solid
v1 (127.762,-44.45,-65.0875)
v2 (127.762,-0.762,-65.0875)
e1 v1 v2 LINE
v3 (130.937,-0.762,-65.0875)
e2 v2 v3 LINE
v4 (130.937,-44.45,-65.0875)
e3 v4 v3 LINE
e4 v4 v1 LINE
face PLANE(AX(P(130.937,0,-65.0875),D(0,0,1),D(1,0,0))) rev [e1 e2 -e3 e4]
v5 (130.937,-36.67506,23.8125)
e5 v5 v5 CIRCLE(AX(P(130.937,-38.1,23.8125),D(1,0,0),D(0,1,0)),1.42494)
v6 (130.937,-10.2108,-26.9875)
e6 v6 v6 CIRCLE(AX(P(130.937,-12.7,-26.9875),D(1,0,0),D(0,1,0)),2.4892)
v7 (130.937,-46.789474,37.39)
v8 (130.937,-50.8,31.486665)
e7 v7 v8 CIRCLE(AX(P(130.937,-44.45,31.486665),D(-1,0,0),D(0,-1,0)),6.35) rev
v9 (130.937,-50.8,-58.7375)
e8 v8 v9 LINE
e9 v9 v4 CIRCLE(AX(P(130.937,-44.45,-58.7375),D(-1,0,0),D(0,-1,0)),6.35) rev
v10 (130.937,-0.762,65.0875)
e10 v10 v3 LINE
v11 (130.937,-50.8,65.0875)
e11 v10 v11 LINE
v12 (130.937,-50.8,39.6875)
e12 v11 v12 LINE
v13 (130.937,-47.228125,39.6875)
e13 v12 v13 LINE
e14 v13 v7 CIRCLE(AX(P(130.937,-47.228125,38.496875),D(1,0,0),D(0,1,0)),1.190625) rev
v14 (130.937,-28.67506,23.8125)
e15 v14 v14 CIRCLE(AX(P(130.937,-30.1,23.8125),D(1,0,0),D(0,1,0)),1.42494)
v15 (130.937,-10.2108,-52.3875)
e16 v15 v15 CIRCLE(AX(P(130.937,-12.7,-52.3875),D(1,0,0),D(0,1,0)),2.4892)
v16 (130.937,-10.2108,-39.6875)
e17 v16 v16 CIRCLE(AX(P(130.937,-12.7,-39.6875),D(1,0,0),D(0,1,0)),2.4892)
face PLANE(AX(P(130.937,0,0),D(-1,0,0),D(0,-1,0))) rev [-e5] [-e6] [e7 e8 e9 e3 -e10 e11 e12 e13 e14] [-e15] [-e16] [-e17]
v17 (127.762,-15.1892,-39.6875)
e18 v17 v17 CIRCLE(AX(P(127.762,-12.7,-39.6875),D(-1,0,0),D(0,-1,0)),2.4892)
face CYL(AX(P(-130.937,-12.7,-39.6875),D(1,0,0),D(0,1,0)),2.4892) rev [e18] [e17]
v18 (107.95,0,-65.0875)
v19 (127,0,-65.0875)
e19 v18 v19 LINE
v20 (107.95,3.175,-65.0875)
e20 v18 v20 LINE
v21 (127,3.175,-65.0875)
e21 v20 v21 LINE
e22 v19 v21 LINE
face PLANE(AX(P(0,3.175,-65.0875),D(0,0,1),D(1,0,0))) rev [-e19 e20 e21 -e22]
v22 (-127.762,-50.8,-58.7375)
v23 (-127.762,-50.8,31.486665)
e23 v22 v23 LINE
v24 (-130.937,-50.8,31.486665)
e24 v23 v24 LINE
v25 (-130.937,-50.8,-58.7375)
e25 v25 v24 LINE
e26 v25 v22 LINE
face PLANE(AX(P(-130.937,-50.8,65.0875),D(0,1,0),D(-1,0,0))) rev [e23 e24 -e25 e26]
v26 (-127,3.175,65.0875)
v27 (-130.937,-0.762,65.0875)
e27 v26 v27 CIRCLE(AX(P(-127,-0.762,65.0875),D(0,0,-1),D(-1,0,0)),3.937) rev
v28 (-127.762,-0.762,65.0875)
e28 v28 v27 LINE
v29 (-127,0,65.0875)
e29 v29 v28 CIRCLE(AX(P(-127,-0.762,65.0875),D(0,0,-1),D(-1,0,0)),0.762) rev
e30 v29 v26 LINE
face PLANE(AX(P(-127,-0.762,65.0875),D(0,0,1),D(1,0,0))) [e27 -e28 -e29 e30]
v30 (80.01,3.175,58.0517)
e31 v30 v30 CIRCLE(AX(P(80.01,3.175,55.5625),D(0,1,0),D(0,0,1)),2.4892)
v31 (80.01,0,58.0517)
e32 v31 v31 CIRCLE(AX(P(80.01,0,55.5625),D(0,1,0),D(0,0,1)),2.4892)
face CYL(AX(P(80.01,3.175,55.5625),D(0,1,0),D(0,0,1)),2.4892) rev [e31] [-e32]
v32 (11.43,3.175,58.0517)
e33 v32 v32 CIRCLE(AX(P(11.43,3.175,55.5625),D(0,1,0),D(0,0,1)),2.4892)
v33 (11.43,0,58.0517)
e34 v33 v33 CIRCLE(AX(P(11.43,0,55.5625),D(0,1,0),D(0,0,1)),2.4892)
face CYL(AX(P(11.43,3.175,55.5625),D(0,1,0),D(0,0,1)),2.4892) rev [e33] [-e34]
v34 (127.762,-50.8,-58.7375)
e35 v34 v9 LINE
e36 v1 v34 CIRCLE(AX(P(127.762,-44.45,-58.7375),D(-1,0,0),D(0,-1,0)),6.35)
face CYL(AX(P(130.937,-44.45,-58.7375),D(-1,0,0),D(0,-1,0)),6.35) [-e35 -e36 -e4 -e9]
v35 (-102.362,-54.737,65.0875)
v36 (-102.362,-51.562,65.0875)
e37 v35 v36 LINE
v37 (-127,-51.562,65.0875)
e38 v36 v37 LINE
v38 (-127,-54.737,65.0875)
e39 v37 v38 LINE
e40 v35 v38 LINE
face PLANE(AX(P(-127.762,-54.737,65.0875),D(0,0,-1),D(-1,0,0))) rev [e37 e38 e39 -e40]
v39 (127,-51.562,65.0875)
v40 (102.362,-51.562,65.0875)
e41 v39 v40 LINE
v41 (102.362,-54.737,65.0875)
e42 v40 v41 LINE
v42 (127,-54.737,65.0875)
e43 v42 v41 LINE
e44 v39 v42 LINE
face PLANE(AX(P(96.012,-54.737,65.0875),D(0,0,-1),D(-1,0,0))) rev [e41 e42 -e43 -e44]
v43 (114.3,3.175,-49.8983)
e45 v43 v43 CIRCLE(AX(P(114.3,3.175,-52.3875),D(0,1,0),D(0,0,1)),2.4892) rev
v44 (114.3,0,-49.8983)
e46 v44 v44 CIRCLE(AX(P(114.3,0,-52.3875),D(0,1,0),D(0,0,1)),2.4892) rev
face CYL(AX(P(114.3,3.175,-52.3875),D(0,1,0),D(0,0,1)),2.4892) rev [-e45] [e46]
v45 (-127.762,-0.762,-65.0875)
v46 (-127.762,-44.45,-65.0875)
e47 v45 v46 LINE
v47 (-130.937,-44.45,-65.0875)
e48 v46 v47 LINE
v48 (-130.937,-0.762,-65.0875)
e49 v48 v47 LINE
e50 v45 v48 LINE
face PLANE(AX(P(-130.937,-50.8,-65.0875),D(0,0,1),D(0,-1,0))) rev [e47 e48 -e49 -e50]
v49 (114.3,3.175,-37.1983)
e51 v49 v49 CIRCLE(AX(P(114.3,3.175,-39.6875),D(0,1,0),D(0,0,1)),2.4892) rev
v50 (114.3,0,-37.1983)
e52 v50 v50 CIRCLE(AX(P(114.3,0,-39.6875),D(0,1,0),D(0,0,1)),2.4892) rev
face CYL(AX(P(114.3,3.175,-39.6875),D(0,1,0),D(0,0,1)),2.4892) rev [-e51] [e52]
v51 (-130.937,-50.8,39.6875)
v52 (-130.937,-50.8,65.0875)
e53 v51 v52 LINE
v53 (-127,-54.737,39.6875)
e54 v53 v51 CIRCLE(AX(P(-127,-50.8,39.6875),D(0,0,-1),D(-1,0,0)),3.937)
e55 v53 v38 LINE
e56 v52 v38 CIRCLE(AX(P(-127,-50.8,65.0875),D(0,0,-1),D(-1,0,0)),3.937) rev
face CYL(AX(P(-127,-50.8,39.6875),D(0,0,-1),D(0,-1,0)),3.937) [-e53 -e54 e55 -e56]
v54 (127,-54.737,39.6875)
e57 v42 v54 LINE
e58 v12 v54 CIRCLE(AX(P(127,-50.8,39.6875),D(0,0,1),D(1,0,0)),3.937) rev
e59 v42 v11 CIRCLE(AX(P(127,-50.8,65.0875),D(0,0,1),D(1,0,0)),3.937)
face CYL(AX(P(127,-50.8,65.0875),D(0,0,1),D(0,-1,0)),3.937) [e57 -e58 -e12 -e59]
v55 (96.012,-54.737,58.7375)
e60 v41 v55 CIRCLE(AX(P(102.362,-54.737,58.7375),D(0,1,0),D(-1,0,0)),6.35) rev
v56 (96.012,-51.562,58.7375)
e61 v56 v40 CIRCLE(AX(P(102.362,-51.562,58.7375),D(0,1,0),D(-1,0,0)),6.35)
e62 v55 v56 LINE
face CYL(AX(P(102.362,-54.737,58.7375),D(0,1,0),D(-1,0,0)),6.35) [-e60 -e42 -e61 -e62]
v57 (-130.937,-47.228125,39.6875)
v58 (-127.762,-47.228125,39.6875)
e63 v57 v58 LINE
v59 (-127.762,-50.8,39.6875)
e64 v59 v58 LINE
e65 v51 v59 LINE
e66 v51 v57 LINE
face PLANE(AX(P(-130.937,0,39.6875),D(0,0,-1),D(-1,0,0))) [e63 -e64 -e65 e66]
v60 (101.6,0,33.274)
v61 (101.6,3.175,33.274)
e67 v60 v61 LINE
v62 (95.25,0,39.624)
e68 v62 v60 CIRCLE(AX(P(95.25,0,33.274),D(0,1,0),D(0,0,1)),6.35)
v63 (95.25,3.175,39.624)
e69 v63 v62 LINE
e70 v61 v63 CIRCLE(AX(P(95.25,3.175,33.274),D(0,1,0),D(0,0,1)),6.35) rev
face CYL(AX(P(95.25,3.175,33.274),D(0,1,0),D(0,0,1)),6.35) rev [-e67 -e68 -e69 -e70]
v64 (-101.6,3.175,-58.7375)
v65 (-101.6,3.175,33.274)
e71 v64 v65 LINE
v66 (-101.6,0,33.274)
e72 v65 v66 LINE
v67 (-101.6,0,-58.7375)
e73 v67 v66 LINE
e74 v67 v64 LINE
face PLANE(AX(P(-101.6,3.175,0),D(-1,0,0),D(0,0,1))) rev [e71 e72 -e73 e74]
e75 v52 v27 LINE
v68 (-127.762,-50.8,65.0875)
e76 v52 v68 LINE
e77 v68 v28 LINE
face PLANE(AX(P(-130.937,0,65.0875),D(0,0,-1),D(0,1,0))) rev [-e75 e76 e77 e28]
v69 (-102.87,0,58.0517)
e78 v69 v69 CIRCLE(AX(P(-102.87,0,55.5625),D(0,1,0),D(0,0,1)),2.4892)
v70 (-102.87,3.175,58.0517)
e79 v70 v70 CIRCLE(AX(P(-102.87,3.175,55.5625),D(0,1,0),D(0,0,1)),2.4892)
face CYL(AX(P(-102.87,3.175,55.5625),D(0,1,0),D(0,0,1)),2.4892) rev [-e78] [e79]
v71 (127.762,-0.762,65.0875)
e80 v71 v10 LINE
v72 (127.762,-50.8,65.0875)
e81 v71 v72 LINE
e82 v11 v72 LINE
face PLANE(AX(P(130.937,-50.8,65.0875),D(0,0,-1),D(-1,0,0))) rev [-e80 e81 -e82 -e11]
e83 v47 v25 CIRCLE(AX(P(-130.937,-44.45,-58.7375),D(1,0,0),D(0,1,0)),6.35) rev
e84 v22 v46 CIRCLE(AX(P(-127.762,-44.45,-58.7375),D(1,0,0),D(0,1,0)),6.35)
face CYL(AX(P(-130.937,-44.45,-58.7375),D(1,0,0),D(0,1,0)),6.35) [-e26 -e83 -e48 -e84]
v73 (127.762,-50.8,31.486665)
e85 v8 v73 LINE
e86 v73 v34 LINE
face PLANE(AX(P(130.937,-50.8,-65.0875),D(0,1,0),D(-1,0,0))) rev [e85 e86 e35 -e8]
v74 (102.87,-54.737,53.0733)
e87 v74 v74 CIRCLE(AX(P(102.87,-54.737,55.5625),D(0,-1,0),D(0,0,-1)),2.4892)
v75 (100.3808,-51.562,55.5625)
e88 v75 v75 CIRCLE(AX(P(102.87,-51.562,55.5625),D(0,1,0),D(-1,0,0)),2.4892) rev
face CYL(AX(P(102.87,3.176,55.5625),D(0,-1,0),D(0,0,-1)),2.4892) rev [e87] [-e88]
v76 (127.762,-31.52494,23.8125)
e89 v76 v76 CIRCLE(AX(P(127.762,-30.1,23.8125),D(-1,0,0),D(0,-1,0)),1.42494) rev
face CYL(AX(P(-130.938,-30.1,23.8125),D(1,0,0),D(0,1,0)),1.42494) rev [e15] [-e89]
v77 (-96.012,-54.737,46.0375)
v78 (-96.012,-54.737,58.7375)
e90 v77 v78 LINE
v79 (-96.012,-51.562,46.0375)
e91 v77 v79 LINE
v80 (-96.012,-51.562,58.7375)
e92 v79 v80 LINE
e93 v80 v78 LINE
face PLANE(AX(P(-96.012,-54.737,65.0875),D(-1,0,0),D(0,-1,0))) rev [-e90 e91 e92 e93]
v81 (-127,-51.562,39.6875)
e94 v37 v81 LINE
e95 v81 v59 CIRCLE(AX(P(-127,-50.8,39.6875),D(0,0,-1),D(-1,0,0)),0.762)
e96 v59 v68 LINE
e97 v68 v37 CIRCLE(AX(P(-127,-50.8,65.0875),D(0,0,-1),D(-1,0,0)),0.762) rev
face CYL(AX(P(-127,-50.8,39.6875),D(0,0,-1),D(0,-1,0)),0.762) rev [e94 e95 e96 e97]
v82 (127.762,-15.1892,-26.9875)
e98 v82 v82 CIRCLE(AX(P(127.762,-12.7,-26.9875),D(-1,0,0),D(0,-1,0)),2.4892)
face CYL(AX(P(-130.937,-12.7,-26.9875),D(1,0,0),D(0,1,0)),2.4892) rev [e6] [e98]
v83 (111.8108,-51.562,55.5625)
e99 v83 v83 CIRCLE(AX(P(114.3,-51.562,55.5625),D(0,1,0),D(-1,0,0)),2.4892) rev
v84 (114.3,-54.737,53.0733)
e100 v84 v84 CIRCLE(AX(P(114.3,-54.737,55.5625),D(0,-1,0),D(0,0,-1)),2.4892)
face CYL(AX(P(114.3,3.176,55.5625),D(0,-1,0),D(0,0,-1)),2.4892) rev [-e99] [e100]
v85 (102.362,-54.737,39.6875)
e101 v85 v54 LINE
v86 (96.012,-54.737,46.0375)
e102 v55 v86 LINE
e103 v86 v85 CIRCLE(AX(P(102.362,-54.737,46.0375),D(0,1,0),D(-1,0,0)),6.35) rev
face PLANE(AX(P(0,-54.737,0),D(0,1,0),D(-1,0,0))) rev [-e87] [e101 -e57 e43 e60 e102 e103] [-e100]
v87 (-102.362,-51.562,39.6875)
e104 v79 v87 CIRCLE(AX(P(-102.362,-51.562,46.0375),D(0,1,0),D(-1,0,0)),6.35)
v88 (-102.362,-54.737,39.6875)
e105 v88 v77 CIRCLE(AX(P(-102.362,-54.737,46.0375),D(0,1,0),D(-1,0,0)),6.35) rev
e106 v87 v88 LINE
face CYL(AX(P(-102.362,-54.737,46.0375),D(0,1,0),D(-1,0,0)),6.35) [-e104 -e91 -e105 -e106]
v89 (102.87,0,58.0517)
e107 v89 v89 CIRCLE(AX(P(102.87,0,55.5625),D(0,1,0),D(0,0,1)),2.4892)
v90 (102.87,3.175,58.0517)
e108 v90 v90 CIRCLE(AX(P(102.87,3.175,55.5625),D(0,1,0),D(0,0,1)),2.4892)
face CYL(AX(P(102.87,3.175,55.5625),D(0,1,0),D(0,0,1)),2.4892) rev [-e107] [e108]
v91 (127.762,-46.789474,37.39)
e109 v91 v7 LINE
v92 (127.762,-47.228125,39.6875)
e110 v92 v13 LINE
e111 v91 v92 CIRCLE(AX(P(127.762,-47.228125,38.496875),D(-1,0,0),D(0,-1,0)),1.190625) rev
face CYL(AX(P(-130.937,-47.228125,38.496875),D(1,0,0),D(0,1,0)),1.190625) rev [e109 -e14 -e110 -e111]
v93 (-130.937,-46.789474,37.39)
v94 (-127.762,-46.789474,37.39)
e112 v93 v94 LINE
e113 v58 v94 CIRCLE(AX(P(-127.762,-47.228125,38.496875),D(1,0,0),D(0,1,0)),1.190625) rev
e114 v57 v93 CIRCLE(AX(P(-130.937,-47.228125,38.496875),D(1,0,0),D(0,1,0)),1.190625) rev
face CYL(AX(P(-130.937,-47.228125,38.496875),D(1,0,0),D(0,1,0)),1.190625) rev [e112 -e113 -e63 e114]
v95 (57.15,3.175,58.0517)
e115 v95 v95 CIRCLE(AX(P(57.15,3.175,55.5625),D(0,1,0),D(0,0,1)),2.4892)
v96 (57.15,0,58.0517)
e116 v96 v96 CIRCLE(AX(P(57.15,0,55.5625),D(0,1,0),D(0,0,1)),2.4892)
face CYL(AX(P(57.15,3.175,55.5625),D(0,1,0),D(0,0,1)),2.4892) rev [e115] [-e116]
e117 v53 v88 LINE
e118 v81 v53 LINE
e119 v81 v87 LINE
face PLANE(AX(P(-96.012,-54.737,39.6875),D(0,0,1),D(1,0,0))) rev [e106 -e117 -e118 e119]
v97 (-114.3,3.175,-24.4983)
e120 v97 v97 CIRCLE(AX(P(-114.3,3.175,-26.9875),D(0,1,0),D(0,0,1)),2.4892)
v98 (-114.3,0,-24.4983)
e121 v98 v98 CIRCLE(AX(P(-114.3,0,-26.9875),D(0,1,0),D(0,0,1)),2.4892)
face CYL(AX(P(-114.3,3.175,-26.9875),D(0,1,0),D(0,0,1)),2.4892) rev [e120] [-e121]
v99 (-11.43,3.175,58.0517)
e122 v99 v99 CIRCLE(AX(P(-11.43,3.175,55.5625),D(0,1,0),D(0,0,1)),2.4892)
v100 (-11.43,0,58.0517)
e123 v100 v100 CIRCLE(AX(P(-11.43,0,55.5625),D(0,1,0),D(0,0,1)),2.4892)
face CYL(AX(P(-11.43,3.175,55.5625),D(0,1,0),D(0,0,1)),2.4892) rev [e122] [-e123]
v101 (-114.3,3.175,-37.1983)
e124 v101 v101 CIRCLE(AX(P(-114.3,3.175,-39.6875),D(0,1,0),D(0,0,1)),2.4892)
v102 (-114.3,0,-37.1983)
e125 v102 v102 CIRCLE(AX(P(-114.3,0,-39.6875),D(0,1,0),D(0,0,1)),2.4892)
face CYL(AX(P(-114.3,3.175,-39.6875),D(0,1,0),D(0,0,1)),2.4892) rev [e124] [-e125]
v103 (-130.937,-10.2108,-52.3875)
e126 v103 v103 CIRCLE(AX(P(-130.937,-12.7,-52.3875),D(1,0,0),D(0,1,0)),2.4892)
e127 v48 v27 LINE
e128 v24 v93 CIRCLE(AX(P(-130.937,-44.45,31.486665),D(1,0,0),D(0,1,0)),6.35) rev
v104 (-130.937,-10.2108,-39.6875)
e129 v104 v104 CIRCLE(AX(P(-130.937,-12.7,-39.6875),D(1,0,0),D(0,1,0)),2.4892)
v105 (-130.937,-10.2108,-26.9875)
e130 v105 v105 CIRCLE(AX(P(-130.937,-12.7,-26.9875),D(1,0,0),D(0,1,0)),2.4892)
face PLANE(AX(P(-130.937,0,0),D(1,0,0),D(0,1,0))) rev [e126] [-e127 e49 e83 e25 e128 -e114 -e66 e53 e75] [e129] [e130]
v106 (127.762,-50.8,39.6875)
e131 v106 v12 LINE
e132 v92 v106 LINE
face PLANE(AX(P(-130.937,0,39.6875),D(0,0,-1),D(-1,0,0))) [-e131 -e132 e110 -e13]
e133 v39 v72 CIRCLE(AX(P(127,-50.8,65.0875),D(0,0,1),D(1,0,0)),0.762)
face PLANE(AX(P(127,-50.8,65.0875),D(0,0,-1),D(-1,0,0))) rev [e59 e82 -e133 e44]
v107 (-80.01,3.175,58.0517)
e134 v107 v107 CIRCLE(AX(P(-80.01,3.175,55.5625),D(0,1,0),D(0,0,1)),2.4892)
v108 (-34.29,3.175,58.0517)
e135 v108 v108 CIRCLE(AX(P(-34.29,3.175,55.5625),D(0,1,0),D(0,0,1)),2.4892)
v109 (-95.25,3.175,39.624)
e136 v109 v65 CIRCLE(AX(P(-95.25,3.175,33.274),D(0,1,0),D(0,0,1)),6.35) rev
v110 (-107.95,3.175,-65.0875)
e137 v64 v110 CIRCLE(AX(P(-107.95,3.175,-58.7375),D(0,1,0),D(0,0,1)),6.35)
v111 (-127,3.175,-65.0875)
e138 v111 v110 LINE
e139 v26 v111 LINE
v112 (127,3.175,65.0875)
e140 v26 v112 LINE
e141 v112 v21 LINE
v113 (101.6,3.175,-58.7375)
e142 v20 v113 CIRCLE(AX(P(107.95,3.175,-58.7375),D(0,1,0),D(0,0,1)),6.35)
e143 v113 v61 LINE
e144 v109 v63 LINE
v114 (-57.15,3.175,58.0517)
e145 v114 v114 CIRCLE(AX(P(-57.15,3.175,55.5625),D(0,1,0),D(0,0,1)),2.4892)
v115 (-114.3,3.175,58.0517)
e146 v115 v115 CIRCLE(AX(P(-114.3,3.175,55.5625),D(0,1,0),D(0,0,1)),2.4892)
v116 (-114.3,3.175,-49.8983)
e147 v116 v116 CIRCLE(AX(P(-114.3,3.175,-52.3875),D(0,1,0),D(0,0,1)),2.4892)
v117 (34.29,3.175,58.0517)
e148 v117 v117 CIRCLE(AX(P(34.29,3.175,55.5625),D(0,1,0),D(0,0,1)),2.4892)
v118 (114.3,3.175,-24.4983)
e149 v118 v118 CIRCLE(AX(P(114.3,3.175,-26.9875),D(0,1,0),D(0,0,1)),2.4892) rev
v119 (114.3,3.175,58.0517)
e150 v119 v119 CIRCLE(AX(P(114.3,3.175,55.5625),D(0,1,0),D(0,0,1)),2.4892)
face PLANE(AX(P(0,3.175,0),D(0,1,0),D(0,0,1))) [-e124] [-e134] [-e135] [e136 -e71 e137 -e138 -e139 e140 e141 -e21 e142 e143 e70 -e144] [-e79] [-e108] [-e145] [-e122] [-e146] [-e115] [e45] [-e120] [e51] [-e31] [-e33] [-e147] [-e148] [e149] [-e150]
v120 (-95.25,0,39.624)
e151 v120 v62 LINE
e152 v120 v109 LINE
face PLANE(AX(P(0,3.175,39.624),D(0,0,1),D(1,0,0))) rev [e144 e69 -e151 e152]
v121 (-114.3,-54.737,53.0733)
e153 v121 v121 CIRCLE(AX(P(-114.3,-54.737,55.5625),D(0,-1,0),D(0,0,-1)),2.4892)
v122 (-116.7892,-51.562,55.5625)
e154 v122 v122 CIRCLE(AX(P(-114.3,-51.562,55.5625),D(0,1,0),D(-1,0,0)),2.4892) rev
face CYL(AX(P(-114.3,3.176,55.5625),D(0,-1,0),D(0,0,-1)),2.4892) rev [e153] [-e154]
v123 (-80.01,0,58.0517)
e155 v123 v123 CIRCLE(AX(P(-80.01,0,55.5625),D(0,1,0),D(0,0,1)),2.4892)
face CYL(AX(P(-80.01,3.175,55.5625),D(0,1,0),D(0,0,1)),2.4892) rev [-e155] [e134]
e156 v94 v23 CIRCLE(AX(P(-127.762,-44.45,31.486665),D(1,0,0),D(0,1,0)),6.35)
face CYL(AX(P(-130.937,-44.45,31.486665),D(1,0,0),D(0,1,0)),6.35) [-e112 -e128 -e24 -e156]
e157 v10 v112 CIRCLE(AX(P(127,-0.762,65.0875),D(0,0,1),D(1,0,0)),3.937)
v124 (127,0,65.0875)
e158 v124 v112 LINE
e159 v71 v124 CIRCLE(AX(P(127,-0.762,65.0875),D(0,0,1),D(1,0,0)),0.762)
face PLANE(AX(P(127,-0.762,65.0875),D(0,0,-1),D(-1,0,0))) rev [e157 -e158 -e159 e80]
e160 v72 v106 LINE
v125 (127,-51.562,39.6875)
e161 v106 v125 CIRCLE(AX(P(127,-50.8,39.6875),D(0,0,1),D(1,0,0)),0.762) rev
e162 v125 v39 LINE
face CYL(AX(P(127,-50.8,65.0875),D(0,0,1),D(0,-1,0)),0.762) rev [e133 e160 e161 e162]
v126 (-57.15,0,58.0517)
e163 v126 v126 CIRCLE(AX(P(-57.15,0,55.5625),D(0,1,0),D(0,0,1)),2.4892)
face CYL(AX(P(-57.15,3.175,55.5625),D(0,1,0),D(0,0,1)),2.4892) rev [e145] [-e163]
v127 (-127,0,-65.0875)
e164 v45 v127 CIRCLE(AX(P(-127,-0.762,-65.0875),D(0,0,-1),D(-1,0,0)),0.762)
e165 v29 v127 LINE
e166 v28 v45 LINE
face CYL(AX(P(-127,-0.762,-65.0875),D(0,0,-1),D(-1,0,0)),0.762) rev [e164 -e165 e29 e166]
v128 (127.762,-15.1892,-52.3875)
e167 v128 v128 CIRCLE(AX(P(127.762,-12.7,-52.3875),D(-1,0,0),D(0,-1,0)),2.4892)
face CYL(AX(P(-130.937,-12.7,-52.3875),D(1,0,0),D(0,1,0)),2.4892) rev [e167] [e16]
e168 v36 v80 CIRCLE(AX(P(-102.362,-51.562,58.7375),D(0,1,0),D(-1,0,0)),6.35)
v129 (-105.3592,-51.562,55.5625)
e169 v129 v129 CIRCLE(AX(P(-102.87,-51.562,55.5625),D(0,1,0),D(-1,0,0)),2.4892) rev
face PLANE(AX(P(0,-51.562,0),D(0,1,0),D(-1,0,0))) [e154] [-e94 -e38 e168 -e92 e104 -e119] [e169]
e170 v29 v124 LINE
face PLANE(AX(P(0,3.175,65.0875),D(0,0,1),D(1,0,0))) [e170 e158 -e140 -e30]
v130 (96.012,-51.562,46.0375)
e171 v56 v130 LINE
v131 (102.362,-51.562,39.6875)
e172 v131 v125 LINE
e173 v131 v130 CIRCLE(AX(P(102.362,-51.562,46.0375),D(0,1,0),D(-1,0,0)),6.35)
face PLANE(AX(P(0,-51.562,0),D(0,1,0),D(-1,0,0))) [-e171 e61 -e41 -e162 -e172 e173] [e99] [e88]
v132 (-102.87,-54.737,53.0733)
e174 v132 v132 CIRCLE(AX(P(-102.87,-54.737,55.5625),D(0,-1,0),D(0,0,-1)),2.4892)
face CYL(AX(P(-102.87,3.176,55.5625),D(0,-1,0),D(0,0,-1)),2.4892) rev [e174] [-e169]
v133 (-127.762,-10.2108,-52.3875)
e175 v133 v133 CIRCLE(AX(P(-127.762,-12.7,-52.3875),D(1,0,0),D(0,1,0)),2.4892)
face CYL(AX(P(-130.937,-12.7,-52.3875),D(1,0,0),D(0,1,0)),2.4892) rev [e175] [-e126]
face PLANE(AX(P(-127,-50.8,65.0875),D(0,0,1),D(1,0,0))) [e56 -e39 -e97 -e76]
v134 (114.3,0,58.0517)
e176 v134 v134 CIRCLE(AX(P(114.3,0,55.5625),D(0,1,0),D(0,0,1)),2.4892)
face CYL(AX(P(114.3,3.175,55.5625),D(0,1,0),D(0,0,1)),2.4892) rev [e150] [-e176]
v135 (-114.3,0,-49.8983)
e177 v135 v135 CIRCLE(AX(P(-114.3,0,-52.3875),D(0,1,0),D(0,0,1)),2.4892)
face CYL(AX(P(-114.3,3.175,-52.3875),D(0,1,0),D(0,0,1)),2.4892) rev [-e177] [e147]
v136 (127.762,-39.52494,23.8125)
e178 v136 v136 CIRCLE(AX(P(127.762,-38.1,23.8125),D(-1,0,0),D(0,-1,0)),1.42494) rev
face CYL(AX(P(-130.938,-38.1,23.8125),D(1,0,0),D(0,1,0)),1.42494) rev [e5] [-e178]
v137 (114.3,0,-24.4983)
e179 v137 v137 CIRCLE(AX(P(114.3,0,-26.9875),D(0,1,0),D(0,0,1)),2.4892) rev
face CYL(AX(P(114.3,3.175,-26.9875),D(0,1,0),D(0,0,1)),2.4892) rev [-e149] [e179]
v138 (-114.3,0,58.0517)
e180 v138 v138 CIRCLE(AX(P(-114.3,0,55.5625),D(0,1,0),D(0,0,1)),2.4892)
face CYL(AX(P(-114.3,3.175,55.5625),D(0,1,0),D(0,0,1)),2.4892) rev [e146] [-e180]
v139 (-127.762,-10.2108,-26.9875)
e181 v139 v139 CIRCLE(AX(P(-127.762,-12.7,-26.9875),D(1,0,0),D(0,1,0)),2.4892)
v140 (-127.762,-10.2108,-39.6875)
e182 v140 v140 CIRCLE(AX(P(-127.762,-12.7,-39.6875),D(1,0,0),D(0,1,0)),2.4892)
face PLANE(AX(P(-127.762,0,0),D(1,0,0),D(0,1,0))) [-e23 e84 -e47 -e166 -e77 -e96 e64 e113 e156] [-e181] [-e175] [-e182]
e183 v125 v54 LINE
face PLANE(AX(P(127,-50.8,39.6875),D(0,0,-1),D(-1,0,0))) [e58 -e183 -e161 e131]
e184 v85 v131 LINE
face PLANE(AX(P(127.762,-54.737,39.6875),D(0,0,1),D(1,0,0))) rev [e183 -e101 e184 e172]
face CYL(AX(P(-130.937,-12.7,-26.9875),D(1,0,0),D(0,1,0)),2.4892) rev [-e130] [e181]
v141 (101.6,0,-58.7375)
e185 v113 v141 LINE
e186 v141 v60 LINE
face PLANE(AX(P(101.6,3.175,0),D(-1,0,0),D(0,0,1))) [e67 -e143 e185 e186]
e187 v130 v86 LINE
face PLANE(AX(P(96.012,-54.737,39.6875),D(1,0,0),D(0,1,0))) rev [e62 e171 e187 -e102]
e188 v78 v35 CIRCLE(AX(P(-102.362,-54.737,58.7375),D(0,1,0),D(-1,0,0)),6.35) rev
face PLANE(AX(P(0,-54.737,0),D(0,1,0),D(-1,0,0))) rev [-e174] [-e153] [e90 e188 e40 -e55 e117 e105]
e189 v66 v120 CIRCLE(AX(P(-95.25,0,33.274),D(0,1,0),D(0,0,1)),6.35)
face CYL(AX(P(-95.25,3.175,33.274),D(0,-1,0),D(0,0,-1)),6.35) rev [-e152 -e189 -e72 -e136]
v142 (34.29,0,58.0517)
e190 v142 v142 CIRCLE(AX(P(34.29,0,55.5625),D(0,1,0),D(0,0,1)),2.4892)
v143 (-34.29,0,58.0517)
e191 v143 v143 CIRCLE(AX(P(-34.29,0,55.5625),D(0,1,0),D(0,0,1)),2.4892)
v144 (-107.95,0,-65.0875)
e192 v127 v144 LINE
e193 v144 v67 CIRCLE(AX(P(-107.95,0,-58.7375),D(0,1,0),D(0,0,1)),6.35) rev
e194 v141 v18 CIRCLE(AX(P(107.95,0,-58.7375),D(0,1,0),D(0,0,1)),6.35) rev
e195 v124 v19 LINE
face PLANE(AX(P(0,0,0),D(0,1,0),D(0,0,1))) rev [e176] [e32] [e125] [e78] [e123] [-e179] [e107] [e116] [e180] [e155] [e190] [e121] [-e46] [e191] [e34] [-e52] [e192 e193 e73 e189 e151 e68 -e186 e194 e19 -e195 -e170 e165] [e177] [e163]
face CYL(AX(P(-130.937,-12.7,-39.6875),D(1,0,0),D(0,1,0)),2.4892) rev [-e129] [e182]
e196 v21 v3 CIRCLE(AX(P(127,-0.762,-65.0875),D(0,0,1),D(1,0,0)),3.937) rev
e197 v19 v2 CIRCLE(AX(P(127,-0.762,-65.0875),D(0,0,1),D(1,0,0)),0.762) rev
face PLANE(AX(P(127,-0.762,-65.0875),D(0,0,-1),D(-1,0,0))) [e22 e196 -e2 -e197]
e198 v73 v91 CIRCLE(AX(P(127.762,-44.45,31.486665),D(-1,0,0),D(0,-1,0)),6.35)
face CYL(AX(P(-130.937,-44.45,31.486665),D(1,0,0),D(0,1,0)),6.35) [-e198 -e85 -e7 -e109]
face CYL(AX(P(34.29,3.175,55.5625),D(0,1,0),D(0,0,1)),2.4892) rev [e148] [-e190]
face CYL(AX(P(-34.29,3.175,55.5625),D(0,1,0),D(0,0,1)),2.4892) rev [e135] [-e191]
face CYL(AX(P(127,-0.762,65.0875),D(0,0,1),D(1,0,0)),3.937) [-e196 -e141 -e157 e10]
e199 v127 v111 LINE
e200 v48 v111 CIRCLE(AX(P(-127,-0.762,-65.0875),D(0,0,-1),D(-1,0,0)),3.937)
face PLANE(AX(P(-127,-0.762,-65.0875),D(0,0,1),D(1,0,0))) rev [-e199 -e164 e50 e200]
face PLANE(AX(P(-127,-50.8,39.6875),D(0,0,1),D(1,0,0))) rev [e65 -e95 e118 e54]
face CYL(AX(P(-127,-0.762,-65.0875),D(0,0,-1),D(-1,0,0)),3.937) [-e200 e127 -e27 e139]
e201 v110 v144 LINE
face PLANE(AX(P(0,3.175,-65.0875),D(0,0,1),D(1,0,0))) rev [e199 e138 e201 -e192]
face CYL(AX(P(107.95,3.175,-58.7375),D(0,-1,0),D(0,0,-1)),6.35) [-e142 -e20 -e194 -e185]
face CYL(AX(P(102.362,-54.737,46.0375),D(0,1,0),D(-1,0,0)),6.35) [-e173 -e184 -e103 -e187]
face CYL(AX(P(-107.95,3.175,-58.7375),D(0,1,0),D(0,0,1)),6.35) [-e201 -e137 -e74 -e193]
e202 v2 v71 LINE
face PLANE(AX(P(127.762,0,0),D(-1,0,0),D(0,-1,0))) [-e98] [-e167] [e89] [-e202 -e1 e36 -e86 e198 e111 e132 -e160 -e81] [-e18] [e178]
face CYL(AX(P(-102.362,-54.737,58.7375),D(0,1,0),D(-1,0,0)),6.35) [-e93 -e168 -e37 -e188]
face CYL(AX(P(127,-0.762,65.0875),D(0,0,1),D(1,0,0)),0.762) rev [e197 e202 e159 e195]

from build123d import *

# Parameters (mm, degrees)
SKETCH2_R               = 2.4892
BOSS_EXTRUDE1_DEPTH     = 3.175
SKETCH3_R               = 2.4892
CUT_EXTRUDE1_DEPTH      = 143.74264703
EDGE_FLANGE1_DEPTH      = 130.175
EDGE_FLANGE1_BEND_DEPTH = 130.175
CUT_EXTRUDE2_DEPTH      = 275.581526204
EDGE_FLANGE2_DEPTH      = 25.4
EDGE_FLANGE2_BEND_DEPTH = 25.4
CUT_EXTRUDE3_REACH      = 159.273
SKETCH22_R              = 2.4892
FILLET2_R               = 6.35
SKETCH23_R              = 2.4892
CUT_EXTRUDE4_DEPTH      = 276.337091157
CUT_EXTRUDE5_REACH      = 277.337
SKETCH24_R              = 1.42494


# Sheet-metal steps are written as plain solids
with BuildPart() as part:
    # Sketch2 → Boss-Extrude1 (new body)
    with BuildSketch(Plane(origin=(0, 0, 0), x_dir=(1, 0, 0), z_dir=(0, 1, 0))):
        Polygon((-127, 65.0875), (-127, -65.0875), (127, -65.0875), (127, 65.0875), (101.6, 65.0875), (101.6, -39.624), (-101.6, -39.624), (-101.6, 65.0875), align=None)
        with Locations(Location((-114.3, 26.9875, 0), (0, 0, 270))):
            Circle(SKETCH2_R, mode=Mode.SUBTRACT)
        with Locations(Location((-114.3, 39.6875, 0), (0, 0, 270))):
            Circle(SKETCH2_R, mode=Mode.SUBTRACT)
        with Locations(Location((-114.3, 52.3875, 0), (0, 0, 270))):
            Circle(SKETCH2_R, mode=Mode.SUBTRACT)
        with Locations(Location((114.3, 26.9875, 0), (0, 0, 270))):
            Circle(SKETCH2_R, mode=Mode.SUBTRACT)
        with Locations(Location((114.3, 39.6875, 0), (0, 0, 270))):
            Circle(SKETCH2_R, mode=Mode.SUBTRACT)
        with Locations(Location((114.3, 52.3875, 0), (0, 0, 270))):
            Circle(SKETCH2_R, mode=Mode.SUBTRACT)
    extrude(amount=BOSS_EXTRUDE1_DEPTH)

    # Sketch3 → Cut-Extrude1 (cut, through all)
    with BuildSketch(Plane(origin=(0, 3.175, 0), x_dir=(1, 0, 0), z_dir=(0, 1, 0))):
        with Locations(Location((-102.87, -55.5625, 0), (0, 0, 270))):
            Circle(SKETCH3_R)
        with Locations(Location((-80.01, -55.5625, 0), (0, 0, 270))):
            Circle(SKETCH3_R)
        with Locations(Location((-114.3, -55.5625, 0), (0, 0, 270))):
            Circle(SKETCH3_R)
        with Locations(Location((-57.15, -55.5625, 0), (0, 0, 270))):
            Circle(SKETCH3_R)
        with Locations(Location((114.3, -55.5625, 0), (0, 0, 270))):
            Circle(SKETCH3_R)
        with Locations(Location((-34.29, -55.5625, 0), (0, 0, 270))):
            Circle(SKETCH3_R)
        with Locations(Location((-11.43, -55.5625, 0), (0, 0, 270))):
            Circle(SKETCH3_R)
        with Locations(Location((11.43, -55.5625, 0), (0, 0, 270))):
            Circle(SKETCH3_R)
        with Locations(Location((34.29, -55.5625, 0), (0, 0, 270))):
            Circle(SKETCH3_R)
        with Locations(Location((57.15, -55.5625, 0), (0, 0, 270))):
            Circle(SKETCH3_R)
        with Locations(Location((80.01, -55.5625, 0), (0, 0, 270))):
            Circle(SKETCH3_R)
        with Locations(Location((102.87, -55.5625, 0), (0, 0, 270))):
            Circle(SKETCH3_R)
    extrude(amount=-CUT_EXTRUDE1_DEPTH, mode=Mode.SUBTRACT)

    # Edge-Flange1 section (across the edge) → Edge-Flange1 (add)
    with BuildSketch(Plane(origin=(127.762, 0, -65.0875), x_dir=(-1, 0, 0), z_dir=(0, 0, 1))):
        with BuildLine():
            Line((-3.175, 0.762), (-3.175, 50.8))
            Line((-3.175, 50.8), (0, 50.8))
            Line((0, 50.8), (0, 0.762))
            ThreePointArc((0, 0.762), (0.223184633, 0.223184633), (0.762, 0))
            Line((0.762, 0), (0.762, -3.175))
            ThreePointArc((0.762, -3.175), (-2.021879398, -2.021879398), (-3.175, 0.762))
        make_face()
    extrude(amount=EDGE_FLANGE1_DEPTH)

    # Edge-Flange1 section 2 (across the edge) → Edge-Flange1 bend (add)
    with BuildSketch(Plane(origin=(-127.762, 0, 65.0875), x_dir=(1, 0, 0), z_dir=(0, 0, -1))):
        with BuildLine():
            Line((-3.175, 0.762), (-3.175, 50.8))
            Line((-3.175, 50.8), (0, 50.8))
            Line((0, 50.8), (0, 0.762))
            ThreePointArc((0, 0.762), (0.223184633, 0.223184633), (0.762, 0))
            Line((0.762, 0), (0.762, -3.175))
            ThreePointArc((0.762, -3.175), (-2.021879398, -2.021879398), (-3.175, 0.762))
        make_face()
    extrude(amount=EDGE_FLANGE1_BEND_DEPTH)

    # Sketch15 → Cut-Extrude2 (cut, through all)
    with BuildSketch(Plane(origin=(130.937, 0, 0), x_dir=(0, 0, -1), z_dir=(1, 0, 0))):
        with BuildLine():
            Line((-39.6875, -47.228125), (-39.6875, -50.8))
            Line((-39.6875, -50.8), (-37.30625, -50.8))
            Line((-37.30625, -50.8), (-37.30625, -47.228125))
            ThreePointArc((-37.30625, -47.228125), (-37.654975989, -46.386225989), (-38.496875, -46.0375))
            ThreePointArc((-38.496875, -46.0375), (-39.338774011, -46.386225989), (-39.6875, -47.228125))
        make_face()
    extrude(amount=-CUT_EXTRUDE2_DEPTH, mode=Mode.SUBTRACT)

    # Edge-Flange2 section (across the edge) → Edge-Flange2 (add)
    with BuildSketch(Plane(origin=(127.762, -51.562, 39.6875), x_dir=(0, 1, 0), z_dir=(0, 0, 1))):
        with BuildLine():
            Line((-3.175, 0.762), (-3.175, 31.75))
            Line((-3.175, 31.75), (0, 31.75))
            Line((0, 31.75), (0, 0.762))
            ThreePointArc((0, 0.762), (0.223184633, 0.223184633), (0.762, 0))
            Line((0.762, 0), (0.762, -3.175))
            ThreePointArc((0.762, -3.175), (-2.021879398, -2.021879398), (-3.175, 0.762))
        make_face()
    extrude(amount=EDGE_FLANGE2_DEPTH)

    # Edge-Flange2 section 2 (across the edge) → Edge-Flange2 bend (add)
    with BuildSketch(Plane(origin=(-127.762, -51.562, 65.0875), x_dir=(0, 1, 0), z_dir=(0, 0, -1))):
        with BuildLine():
            Line((-3.175, 0.762), (-3.175, 31.75))
            Line((-3.175, 31.75), (0, 31.75))
            Line((0, 31.75), (0, 0.762))
            ThreePointArc((0, 0.762), (0.223184633, 0.223184633), (0.762, 0))
            Line((0.762, 0), (0.762, -3.175))
            ThreePointArc((0.762, -3.175), (-2.021879398, -2.021879398), (-3.175, 0.762))
        make_face()
    extrude(amount=EDGE_FLANGE2_BEND_DEPTH)

    # Sketch22 → Cut-Extrude3 (cut, up to next)
    with BuildSketch(Plane.XZ.offset(54.737), mode=Mode.PRIVATE) as cut_extrude3_sk1:
        with Locations(Location((-102.87, 55.5625, 0), (0, 0, 90))):
            Circle(SKETCH22_R)
    cut_extrude3_tool1 = extrude(cut_extrude3_sk1.sketch, amount=-CUT_EXTRUDE3_REACH, mode=Mode.PRIVATE) & part.part
    # Sketch22 → Cut-Extrude3 (cut, up to next)
    with BuildSketch(Plane.XZ.offset(54.737), mode=Mode.PRIVATE) as cut_extrude3_sk2:
        with Locations(Location((-114.3, 55.5625, 0), (0, 0, 90))):
            Circle(SKETCH22_R)
    cut_extrude3_tool2 = extrude(cut_extrude3_sk2.sketch, amount=-CUT_EXTRUDE3_REACH, mode=Mode.PRIVATE) & part.part
    # Sketch22 → Cut-Extrude3 (cut, up to next)
    with BuildSketch(Plane.XZ.offset(54.737), mode=Mode.PRIVATE) as cut_extrude3_sk3:
        with Locations(Location((102.87, 55.5625, 0), (0, 0, 90))):
            Circle(SKETCH22_R)
    cut_extrude3_tool3 = extrude(cut_extrude3_sk3.sketch, amount=-CUT_EXTRUDE3_REACH, mode=Mode.PRIVATE) & part.part
    # Sketch22 → Cut-Extrude3 (cut, up to next)
    with BuildSketch(Plane.XZ.offset(54.737), mode=Mode.PRIVATE) as cut_extrude3_sk4:
        with Locations(Location((114.3, 55.5625, 0), (0, 0, 90))):
            Circle(SKETCH22_R)
    cut_extrude3_tool4 = extrude(cut_extrude3_sk4.sketch, amount=-CUT_EXTRUDE3_REACH, mode=Mode.PRIVATE) & part.part
    add(cut_extrude3_tool1.solids().sort_by_distance((-102.87, -54.737, 55.5625))[0], mode=Mode.SUBTRACT)
    add(cut_extrude3_tool2.solids().sort_by_distance((-114.3, -54.737, 55.5625))[0], mode=Mode.SUBTRACT)
    add(cut_extrude3_tool3.solids().sort_by_distance((102.87, -54.737, 55.5625))[0], mode=Mode.SUBTRACT)
    add(cut_extrude3_tool4.solids().sort_by_distance((114.3, -54.737, 55.5625))[0], mode=Mode.SUBTRACT)

    # Fillet2
    fillet2_edges = [part.edges().sort_by_distance(p)[0] for p in [
        (96.012, -53.1495, 65.0875),
        (96.012, -53.1495, 39.6875),
        (129.3495, -50.8, -65.0875),
        (101.6, 1.5875, -65.0875),
        (101.6, 1.5875, 39.624),
        (-101.6, 1.5875, 39.624),
        (-101.6, 1.5875, -65.0875),
        (-129.3495, -50.8, -65.0875),
        (-96.012, -53.1495, 65.0875),
        (-96.012, -53.1495, 39.6875),
        (129.3495, -50.8, 37.30625),
        (-129.3495, -50.8, 37.30625),
    ]]
    fillet(fillet2_edges, radius=FILLET2_R)

    # Sketch23 → Cut-Extrude4 (cut, through all)
    with BuildSketch(Plane(origin=(130.937, 0, 0), x_dir=(0, 0, -1), z_dir=(1, 0, 0))):
        with Locations(Location((52.3875, -12.7, 0), (0, 0, 90))):
            Circle(SKETCH23_R)
        with Locations(Location((39.6875, -12.7, 0), (0, 0, 90))):
            Circle(SKETCH23_R)
        with Locations(Location((26.9875, -12.7, 0), (0, 0, 90))):
            Circle(SKETCH23_R)
    extrude(amount=-CUT_EXTRUDE4_DEPTH, mode=Mode.SUBTRACT)

    # Sketch24 → Cut-Extrude5 (cut, up to next)
    with BuildSketch(Plane(origin=(130.937, 0, 0), x_dir=(0, 0, -1), z_dir=(1, 0, 0)), mode=Mode.PRIVATE) as cut_extrude5_sk1:
        with Locations(Location((-23.8125, -38.1, 0), (0, 0, 90))):
            Circle(SKETCH24_R)
    cut_extrude5_tool1 = extrude(cut_extrude5_sk1.sketch, amount=-CUT_EXTRUDE5_REACH, mode=Mode.PRIVATE) & part.part
    # Sketch24 → Cut-Extrude5 (cut, up to next)
    with BuildSketch(Plane(origin=(130.937, 0, 0), x_dir=(0, 0, -1), z_dir=(1, 0, 0)), mode=Mode.PRIVATE) as cut_extrude5_sk2:
        with Locations(Location((-23.8125, -30.099999998, 0), (0, 0, 90))):
            Circle(SKETCH24_R)
    cut_extrude5_tool2 = extrude(cut_extrude5_sk2.sketch, amount=-CUT_EXTRUDE5_REACH, mode=Mode.PRIVATE) & part.part
    add(cut_extrude5_tool1.solids().sort_by_distance((130.937, -38.1, 23.8125))[0], mode=Mode.SUBTRACT)
    add(cut_extrude5_tool2.solids().sort_by_distance((130.937, -30.1, 23.8125))[0], mode=Mode.SUBTRACT)


solid = part.part
